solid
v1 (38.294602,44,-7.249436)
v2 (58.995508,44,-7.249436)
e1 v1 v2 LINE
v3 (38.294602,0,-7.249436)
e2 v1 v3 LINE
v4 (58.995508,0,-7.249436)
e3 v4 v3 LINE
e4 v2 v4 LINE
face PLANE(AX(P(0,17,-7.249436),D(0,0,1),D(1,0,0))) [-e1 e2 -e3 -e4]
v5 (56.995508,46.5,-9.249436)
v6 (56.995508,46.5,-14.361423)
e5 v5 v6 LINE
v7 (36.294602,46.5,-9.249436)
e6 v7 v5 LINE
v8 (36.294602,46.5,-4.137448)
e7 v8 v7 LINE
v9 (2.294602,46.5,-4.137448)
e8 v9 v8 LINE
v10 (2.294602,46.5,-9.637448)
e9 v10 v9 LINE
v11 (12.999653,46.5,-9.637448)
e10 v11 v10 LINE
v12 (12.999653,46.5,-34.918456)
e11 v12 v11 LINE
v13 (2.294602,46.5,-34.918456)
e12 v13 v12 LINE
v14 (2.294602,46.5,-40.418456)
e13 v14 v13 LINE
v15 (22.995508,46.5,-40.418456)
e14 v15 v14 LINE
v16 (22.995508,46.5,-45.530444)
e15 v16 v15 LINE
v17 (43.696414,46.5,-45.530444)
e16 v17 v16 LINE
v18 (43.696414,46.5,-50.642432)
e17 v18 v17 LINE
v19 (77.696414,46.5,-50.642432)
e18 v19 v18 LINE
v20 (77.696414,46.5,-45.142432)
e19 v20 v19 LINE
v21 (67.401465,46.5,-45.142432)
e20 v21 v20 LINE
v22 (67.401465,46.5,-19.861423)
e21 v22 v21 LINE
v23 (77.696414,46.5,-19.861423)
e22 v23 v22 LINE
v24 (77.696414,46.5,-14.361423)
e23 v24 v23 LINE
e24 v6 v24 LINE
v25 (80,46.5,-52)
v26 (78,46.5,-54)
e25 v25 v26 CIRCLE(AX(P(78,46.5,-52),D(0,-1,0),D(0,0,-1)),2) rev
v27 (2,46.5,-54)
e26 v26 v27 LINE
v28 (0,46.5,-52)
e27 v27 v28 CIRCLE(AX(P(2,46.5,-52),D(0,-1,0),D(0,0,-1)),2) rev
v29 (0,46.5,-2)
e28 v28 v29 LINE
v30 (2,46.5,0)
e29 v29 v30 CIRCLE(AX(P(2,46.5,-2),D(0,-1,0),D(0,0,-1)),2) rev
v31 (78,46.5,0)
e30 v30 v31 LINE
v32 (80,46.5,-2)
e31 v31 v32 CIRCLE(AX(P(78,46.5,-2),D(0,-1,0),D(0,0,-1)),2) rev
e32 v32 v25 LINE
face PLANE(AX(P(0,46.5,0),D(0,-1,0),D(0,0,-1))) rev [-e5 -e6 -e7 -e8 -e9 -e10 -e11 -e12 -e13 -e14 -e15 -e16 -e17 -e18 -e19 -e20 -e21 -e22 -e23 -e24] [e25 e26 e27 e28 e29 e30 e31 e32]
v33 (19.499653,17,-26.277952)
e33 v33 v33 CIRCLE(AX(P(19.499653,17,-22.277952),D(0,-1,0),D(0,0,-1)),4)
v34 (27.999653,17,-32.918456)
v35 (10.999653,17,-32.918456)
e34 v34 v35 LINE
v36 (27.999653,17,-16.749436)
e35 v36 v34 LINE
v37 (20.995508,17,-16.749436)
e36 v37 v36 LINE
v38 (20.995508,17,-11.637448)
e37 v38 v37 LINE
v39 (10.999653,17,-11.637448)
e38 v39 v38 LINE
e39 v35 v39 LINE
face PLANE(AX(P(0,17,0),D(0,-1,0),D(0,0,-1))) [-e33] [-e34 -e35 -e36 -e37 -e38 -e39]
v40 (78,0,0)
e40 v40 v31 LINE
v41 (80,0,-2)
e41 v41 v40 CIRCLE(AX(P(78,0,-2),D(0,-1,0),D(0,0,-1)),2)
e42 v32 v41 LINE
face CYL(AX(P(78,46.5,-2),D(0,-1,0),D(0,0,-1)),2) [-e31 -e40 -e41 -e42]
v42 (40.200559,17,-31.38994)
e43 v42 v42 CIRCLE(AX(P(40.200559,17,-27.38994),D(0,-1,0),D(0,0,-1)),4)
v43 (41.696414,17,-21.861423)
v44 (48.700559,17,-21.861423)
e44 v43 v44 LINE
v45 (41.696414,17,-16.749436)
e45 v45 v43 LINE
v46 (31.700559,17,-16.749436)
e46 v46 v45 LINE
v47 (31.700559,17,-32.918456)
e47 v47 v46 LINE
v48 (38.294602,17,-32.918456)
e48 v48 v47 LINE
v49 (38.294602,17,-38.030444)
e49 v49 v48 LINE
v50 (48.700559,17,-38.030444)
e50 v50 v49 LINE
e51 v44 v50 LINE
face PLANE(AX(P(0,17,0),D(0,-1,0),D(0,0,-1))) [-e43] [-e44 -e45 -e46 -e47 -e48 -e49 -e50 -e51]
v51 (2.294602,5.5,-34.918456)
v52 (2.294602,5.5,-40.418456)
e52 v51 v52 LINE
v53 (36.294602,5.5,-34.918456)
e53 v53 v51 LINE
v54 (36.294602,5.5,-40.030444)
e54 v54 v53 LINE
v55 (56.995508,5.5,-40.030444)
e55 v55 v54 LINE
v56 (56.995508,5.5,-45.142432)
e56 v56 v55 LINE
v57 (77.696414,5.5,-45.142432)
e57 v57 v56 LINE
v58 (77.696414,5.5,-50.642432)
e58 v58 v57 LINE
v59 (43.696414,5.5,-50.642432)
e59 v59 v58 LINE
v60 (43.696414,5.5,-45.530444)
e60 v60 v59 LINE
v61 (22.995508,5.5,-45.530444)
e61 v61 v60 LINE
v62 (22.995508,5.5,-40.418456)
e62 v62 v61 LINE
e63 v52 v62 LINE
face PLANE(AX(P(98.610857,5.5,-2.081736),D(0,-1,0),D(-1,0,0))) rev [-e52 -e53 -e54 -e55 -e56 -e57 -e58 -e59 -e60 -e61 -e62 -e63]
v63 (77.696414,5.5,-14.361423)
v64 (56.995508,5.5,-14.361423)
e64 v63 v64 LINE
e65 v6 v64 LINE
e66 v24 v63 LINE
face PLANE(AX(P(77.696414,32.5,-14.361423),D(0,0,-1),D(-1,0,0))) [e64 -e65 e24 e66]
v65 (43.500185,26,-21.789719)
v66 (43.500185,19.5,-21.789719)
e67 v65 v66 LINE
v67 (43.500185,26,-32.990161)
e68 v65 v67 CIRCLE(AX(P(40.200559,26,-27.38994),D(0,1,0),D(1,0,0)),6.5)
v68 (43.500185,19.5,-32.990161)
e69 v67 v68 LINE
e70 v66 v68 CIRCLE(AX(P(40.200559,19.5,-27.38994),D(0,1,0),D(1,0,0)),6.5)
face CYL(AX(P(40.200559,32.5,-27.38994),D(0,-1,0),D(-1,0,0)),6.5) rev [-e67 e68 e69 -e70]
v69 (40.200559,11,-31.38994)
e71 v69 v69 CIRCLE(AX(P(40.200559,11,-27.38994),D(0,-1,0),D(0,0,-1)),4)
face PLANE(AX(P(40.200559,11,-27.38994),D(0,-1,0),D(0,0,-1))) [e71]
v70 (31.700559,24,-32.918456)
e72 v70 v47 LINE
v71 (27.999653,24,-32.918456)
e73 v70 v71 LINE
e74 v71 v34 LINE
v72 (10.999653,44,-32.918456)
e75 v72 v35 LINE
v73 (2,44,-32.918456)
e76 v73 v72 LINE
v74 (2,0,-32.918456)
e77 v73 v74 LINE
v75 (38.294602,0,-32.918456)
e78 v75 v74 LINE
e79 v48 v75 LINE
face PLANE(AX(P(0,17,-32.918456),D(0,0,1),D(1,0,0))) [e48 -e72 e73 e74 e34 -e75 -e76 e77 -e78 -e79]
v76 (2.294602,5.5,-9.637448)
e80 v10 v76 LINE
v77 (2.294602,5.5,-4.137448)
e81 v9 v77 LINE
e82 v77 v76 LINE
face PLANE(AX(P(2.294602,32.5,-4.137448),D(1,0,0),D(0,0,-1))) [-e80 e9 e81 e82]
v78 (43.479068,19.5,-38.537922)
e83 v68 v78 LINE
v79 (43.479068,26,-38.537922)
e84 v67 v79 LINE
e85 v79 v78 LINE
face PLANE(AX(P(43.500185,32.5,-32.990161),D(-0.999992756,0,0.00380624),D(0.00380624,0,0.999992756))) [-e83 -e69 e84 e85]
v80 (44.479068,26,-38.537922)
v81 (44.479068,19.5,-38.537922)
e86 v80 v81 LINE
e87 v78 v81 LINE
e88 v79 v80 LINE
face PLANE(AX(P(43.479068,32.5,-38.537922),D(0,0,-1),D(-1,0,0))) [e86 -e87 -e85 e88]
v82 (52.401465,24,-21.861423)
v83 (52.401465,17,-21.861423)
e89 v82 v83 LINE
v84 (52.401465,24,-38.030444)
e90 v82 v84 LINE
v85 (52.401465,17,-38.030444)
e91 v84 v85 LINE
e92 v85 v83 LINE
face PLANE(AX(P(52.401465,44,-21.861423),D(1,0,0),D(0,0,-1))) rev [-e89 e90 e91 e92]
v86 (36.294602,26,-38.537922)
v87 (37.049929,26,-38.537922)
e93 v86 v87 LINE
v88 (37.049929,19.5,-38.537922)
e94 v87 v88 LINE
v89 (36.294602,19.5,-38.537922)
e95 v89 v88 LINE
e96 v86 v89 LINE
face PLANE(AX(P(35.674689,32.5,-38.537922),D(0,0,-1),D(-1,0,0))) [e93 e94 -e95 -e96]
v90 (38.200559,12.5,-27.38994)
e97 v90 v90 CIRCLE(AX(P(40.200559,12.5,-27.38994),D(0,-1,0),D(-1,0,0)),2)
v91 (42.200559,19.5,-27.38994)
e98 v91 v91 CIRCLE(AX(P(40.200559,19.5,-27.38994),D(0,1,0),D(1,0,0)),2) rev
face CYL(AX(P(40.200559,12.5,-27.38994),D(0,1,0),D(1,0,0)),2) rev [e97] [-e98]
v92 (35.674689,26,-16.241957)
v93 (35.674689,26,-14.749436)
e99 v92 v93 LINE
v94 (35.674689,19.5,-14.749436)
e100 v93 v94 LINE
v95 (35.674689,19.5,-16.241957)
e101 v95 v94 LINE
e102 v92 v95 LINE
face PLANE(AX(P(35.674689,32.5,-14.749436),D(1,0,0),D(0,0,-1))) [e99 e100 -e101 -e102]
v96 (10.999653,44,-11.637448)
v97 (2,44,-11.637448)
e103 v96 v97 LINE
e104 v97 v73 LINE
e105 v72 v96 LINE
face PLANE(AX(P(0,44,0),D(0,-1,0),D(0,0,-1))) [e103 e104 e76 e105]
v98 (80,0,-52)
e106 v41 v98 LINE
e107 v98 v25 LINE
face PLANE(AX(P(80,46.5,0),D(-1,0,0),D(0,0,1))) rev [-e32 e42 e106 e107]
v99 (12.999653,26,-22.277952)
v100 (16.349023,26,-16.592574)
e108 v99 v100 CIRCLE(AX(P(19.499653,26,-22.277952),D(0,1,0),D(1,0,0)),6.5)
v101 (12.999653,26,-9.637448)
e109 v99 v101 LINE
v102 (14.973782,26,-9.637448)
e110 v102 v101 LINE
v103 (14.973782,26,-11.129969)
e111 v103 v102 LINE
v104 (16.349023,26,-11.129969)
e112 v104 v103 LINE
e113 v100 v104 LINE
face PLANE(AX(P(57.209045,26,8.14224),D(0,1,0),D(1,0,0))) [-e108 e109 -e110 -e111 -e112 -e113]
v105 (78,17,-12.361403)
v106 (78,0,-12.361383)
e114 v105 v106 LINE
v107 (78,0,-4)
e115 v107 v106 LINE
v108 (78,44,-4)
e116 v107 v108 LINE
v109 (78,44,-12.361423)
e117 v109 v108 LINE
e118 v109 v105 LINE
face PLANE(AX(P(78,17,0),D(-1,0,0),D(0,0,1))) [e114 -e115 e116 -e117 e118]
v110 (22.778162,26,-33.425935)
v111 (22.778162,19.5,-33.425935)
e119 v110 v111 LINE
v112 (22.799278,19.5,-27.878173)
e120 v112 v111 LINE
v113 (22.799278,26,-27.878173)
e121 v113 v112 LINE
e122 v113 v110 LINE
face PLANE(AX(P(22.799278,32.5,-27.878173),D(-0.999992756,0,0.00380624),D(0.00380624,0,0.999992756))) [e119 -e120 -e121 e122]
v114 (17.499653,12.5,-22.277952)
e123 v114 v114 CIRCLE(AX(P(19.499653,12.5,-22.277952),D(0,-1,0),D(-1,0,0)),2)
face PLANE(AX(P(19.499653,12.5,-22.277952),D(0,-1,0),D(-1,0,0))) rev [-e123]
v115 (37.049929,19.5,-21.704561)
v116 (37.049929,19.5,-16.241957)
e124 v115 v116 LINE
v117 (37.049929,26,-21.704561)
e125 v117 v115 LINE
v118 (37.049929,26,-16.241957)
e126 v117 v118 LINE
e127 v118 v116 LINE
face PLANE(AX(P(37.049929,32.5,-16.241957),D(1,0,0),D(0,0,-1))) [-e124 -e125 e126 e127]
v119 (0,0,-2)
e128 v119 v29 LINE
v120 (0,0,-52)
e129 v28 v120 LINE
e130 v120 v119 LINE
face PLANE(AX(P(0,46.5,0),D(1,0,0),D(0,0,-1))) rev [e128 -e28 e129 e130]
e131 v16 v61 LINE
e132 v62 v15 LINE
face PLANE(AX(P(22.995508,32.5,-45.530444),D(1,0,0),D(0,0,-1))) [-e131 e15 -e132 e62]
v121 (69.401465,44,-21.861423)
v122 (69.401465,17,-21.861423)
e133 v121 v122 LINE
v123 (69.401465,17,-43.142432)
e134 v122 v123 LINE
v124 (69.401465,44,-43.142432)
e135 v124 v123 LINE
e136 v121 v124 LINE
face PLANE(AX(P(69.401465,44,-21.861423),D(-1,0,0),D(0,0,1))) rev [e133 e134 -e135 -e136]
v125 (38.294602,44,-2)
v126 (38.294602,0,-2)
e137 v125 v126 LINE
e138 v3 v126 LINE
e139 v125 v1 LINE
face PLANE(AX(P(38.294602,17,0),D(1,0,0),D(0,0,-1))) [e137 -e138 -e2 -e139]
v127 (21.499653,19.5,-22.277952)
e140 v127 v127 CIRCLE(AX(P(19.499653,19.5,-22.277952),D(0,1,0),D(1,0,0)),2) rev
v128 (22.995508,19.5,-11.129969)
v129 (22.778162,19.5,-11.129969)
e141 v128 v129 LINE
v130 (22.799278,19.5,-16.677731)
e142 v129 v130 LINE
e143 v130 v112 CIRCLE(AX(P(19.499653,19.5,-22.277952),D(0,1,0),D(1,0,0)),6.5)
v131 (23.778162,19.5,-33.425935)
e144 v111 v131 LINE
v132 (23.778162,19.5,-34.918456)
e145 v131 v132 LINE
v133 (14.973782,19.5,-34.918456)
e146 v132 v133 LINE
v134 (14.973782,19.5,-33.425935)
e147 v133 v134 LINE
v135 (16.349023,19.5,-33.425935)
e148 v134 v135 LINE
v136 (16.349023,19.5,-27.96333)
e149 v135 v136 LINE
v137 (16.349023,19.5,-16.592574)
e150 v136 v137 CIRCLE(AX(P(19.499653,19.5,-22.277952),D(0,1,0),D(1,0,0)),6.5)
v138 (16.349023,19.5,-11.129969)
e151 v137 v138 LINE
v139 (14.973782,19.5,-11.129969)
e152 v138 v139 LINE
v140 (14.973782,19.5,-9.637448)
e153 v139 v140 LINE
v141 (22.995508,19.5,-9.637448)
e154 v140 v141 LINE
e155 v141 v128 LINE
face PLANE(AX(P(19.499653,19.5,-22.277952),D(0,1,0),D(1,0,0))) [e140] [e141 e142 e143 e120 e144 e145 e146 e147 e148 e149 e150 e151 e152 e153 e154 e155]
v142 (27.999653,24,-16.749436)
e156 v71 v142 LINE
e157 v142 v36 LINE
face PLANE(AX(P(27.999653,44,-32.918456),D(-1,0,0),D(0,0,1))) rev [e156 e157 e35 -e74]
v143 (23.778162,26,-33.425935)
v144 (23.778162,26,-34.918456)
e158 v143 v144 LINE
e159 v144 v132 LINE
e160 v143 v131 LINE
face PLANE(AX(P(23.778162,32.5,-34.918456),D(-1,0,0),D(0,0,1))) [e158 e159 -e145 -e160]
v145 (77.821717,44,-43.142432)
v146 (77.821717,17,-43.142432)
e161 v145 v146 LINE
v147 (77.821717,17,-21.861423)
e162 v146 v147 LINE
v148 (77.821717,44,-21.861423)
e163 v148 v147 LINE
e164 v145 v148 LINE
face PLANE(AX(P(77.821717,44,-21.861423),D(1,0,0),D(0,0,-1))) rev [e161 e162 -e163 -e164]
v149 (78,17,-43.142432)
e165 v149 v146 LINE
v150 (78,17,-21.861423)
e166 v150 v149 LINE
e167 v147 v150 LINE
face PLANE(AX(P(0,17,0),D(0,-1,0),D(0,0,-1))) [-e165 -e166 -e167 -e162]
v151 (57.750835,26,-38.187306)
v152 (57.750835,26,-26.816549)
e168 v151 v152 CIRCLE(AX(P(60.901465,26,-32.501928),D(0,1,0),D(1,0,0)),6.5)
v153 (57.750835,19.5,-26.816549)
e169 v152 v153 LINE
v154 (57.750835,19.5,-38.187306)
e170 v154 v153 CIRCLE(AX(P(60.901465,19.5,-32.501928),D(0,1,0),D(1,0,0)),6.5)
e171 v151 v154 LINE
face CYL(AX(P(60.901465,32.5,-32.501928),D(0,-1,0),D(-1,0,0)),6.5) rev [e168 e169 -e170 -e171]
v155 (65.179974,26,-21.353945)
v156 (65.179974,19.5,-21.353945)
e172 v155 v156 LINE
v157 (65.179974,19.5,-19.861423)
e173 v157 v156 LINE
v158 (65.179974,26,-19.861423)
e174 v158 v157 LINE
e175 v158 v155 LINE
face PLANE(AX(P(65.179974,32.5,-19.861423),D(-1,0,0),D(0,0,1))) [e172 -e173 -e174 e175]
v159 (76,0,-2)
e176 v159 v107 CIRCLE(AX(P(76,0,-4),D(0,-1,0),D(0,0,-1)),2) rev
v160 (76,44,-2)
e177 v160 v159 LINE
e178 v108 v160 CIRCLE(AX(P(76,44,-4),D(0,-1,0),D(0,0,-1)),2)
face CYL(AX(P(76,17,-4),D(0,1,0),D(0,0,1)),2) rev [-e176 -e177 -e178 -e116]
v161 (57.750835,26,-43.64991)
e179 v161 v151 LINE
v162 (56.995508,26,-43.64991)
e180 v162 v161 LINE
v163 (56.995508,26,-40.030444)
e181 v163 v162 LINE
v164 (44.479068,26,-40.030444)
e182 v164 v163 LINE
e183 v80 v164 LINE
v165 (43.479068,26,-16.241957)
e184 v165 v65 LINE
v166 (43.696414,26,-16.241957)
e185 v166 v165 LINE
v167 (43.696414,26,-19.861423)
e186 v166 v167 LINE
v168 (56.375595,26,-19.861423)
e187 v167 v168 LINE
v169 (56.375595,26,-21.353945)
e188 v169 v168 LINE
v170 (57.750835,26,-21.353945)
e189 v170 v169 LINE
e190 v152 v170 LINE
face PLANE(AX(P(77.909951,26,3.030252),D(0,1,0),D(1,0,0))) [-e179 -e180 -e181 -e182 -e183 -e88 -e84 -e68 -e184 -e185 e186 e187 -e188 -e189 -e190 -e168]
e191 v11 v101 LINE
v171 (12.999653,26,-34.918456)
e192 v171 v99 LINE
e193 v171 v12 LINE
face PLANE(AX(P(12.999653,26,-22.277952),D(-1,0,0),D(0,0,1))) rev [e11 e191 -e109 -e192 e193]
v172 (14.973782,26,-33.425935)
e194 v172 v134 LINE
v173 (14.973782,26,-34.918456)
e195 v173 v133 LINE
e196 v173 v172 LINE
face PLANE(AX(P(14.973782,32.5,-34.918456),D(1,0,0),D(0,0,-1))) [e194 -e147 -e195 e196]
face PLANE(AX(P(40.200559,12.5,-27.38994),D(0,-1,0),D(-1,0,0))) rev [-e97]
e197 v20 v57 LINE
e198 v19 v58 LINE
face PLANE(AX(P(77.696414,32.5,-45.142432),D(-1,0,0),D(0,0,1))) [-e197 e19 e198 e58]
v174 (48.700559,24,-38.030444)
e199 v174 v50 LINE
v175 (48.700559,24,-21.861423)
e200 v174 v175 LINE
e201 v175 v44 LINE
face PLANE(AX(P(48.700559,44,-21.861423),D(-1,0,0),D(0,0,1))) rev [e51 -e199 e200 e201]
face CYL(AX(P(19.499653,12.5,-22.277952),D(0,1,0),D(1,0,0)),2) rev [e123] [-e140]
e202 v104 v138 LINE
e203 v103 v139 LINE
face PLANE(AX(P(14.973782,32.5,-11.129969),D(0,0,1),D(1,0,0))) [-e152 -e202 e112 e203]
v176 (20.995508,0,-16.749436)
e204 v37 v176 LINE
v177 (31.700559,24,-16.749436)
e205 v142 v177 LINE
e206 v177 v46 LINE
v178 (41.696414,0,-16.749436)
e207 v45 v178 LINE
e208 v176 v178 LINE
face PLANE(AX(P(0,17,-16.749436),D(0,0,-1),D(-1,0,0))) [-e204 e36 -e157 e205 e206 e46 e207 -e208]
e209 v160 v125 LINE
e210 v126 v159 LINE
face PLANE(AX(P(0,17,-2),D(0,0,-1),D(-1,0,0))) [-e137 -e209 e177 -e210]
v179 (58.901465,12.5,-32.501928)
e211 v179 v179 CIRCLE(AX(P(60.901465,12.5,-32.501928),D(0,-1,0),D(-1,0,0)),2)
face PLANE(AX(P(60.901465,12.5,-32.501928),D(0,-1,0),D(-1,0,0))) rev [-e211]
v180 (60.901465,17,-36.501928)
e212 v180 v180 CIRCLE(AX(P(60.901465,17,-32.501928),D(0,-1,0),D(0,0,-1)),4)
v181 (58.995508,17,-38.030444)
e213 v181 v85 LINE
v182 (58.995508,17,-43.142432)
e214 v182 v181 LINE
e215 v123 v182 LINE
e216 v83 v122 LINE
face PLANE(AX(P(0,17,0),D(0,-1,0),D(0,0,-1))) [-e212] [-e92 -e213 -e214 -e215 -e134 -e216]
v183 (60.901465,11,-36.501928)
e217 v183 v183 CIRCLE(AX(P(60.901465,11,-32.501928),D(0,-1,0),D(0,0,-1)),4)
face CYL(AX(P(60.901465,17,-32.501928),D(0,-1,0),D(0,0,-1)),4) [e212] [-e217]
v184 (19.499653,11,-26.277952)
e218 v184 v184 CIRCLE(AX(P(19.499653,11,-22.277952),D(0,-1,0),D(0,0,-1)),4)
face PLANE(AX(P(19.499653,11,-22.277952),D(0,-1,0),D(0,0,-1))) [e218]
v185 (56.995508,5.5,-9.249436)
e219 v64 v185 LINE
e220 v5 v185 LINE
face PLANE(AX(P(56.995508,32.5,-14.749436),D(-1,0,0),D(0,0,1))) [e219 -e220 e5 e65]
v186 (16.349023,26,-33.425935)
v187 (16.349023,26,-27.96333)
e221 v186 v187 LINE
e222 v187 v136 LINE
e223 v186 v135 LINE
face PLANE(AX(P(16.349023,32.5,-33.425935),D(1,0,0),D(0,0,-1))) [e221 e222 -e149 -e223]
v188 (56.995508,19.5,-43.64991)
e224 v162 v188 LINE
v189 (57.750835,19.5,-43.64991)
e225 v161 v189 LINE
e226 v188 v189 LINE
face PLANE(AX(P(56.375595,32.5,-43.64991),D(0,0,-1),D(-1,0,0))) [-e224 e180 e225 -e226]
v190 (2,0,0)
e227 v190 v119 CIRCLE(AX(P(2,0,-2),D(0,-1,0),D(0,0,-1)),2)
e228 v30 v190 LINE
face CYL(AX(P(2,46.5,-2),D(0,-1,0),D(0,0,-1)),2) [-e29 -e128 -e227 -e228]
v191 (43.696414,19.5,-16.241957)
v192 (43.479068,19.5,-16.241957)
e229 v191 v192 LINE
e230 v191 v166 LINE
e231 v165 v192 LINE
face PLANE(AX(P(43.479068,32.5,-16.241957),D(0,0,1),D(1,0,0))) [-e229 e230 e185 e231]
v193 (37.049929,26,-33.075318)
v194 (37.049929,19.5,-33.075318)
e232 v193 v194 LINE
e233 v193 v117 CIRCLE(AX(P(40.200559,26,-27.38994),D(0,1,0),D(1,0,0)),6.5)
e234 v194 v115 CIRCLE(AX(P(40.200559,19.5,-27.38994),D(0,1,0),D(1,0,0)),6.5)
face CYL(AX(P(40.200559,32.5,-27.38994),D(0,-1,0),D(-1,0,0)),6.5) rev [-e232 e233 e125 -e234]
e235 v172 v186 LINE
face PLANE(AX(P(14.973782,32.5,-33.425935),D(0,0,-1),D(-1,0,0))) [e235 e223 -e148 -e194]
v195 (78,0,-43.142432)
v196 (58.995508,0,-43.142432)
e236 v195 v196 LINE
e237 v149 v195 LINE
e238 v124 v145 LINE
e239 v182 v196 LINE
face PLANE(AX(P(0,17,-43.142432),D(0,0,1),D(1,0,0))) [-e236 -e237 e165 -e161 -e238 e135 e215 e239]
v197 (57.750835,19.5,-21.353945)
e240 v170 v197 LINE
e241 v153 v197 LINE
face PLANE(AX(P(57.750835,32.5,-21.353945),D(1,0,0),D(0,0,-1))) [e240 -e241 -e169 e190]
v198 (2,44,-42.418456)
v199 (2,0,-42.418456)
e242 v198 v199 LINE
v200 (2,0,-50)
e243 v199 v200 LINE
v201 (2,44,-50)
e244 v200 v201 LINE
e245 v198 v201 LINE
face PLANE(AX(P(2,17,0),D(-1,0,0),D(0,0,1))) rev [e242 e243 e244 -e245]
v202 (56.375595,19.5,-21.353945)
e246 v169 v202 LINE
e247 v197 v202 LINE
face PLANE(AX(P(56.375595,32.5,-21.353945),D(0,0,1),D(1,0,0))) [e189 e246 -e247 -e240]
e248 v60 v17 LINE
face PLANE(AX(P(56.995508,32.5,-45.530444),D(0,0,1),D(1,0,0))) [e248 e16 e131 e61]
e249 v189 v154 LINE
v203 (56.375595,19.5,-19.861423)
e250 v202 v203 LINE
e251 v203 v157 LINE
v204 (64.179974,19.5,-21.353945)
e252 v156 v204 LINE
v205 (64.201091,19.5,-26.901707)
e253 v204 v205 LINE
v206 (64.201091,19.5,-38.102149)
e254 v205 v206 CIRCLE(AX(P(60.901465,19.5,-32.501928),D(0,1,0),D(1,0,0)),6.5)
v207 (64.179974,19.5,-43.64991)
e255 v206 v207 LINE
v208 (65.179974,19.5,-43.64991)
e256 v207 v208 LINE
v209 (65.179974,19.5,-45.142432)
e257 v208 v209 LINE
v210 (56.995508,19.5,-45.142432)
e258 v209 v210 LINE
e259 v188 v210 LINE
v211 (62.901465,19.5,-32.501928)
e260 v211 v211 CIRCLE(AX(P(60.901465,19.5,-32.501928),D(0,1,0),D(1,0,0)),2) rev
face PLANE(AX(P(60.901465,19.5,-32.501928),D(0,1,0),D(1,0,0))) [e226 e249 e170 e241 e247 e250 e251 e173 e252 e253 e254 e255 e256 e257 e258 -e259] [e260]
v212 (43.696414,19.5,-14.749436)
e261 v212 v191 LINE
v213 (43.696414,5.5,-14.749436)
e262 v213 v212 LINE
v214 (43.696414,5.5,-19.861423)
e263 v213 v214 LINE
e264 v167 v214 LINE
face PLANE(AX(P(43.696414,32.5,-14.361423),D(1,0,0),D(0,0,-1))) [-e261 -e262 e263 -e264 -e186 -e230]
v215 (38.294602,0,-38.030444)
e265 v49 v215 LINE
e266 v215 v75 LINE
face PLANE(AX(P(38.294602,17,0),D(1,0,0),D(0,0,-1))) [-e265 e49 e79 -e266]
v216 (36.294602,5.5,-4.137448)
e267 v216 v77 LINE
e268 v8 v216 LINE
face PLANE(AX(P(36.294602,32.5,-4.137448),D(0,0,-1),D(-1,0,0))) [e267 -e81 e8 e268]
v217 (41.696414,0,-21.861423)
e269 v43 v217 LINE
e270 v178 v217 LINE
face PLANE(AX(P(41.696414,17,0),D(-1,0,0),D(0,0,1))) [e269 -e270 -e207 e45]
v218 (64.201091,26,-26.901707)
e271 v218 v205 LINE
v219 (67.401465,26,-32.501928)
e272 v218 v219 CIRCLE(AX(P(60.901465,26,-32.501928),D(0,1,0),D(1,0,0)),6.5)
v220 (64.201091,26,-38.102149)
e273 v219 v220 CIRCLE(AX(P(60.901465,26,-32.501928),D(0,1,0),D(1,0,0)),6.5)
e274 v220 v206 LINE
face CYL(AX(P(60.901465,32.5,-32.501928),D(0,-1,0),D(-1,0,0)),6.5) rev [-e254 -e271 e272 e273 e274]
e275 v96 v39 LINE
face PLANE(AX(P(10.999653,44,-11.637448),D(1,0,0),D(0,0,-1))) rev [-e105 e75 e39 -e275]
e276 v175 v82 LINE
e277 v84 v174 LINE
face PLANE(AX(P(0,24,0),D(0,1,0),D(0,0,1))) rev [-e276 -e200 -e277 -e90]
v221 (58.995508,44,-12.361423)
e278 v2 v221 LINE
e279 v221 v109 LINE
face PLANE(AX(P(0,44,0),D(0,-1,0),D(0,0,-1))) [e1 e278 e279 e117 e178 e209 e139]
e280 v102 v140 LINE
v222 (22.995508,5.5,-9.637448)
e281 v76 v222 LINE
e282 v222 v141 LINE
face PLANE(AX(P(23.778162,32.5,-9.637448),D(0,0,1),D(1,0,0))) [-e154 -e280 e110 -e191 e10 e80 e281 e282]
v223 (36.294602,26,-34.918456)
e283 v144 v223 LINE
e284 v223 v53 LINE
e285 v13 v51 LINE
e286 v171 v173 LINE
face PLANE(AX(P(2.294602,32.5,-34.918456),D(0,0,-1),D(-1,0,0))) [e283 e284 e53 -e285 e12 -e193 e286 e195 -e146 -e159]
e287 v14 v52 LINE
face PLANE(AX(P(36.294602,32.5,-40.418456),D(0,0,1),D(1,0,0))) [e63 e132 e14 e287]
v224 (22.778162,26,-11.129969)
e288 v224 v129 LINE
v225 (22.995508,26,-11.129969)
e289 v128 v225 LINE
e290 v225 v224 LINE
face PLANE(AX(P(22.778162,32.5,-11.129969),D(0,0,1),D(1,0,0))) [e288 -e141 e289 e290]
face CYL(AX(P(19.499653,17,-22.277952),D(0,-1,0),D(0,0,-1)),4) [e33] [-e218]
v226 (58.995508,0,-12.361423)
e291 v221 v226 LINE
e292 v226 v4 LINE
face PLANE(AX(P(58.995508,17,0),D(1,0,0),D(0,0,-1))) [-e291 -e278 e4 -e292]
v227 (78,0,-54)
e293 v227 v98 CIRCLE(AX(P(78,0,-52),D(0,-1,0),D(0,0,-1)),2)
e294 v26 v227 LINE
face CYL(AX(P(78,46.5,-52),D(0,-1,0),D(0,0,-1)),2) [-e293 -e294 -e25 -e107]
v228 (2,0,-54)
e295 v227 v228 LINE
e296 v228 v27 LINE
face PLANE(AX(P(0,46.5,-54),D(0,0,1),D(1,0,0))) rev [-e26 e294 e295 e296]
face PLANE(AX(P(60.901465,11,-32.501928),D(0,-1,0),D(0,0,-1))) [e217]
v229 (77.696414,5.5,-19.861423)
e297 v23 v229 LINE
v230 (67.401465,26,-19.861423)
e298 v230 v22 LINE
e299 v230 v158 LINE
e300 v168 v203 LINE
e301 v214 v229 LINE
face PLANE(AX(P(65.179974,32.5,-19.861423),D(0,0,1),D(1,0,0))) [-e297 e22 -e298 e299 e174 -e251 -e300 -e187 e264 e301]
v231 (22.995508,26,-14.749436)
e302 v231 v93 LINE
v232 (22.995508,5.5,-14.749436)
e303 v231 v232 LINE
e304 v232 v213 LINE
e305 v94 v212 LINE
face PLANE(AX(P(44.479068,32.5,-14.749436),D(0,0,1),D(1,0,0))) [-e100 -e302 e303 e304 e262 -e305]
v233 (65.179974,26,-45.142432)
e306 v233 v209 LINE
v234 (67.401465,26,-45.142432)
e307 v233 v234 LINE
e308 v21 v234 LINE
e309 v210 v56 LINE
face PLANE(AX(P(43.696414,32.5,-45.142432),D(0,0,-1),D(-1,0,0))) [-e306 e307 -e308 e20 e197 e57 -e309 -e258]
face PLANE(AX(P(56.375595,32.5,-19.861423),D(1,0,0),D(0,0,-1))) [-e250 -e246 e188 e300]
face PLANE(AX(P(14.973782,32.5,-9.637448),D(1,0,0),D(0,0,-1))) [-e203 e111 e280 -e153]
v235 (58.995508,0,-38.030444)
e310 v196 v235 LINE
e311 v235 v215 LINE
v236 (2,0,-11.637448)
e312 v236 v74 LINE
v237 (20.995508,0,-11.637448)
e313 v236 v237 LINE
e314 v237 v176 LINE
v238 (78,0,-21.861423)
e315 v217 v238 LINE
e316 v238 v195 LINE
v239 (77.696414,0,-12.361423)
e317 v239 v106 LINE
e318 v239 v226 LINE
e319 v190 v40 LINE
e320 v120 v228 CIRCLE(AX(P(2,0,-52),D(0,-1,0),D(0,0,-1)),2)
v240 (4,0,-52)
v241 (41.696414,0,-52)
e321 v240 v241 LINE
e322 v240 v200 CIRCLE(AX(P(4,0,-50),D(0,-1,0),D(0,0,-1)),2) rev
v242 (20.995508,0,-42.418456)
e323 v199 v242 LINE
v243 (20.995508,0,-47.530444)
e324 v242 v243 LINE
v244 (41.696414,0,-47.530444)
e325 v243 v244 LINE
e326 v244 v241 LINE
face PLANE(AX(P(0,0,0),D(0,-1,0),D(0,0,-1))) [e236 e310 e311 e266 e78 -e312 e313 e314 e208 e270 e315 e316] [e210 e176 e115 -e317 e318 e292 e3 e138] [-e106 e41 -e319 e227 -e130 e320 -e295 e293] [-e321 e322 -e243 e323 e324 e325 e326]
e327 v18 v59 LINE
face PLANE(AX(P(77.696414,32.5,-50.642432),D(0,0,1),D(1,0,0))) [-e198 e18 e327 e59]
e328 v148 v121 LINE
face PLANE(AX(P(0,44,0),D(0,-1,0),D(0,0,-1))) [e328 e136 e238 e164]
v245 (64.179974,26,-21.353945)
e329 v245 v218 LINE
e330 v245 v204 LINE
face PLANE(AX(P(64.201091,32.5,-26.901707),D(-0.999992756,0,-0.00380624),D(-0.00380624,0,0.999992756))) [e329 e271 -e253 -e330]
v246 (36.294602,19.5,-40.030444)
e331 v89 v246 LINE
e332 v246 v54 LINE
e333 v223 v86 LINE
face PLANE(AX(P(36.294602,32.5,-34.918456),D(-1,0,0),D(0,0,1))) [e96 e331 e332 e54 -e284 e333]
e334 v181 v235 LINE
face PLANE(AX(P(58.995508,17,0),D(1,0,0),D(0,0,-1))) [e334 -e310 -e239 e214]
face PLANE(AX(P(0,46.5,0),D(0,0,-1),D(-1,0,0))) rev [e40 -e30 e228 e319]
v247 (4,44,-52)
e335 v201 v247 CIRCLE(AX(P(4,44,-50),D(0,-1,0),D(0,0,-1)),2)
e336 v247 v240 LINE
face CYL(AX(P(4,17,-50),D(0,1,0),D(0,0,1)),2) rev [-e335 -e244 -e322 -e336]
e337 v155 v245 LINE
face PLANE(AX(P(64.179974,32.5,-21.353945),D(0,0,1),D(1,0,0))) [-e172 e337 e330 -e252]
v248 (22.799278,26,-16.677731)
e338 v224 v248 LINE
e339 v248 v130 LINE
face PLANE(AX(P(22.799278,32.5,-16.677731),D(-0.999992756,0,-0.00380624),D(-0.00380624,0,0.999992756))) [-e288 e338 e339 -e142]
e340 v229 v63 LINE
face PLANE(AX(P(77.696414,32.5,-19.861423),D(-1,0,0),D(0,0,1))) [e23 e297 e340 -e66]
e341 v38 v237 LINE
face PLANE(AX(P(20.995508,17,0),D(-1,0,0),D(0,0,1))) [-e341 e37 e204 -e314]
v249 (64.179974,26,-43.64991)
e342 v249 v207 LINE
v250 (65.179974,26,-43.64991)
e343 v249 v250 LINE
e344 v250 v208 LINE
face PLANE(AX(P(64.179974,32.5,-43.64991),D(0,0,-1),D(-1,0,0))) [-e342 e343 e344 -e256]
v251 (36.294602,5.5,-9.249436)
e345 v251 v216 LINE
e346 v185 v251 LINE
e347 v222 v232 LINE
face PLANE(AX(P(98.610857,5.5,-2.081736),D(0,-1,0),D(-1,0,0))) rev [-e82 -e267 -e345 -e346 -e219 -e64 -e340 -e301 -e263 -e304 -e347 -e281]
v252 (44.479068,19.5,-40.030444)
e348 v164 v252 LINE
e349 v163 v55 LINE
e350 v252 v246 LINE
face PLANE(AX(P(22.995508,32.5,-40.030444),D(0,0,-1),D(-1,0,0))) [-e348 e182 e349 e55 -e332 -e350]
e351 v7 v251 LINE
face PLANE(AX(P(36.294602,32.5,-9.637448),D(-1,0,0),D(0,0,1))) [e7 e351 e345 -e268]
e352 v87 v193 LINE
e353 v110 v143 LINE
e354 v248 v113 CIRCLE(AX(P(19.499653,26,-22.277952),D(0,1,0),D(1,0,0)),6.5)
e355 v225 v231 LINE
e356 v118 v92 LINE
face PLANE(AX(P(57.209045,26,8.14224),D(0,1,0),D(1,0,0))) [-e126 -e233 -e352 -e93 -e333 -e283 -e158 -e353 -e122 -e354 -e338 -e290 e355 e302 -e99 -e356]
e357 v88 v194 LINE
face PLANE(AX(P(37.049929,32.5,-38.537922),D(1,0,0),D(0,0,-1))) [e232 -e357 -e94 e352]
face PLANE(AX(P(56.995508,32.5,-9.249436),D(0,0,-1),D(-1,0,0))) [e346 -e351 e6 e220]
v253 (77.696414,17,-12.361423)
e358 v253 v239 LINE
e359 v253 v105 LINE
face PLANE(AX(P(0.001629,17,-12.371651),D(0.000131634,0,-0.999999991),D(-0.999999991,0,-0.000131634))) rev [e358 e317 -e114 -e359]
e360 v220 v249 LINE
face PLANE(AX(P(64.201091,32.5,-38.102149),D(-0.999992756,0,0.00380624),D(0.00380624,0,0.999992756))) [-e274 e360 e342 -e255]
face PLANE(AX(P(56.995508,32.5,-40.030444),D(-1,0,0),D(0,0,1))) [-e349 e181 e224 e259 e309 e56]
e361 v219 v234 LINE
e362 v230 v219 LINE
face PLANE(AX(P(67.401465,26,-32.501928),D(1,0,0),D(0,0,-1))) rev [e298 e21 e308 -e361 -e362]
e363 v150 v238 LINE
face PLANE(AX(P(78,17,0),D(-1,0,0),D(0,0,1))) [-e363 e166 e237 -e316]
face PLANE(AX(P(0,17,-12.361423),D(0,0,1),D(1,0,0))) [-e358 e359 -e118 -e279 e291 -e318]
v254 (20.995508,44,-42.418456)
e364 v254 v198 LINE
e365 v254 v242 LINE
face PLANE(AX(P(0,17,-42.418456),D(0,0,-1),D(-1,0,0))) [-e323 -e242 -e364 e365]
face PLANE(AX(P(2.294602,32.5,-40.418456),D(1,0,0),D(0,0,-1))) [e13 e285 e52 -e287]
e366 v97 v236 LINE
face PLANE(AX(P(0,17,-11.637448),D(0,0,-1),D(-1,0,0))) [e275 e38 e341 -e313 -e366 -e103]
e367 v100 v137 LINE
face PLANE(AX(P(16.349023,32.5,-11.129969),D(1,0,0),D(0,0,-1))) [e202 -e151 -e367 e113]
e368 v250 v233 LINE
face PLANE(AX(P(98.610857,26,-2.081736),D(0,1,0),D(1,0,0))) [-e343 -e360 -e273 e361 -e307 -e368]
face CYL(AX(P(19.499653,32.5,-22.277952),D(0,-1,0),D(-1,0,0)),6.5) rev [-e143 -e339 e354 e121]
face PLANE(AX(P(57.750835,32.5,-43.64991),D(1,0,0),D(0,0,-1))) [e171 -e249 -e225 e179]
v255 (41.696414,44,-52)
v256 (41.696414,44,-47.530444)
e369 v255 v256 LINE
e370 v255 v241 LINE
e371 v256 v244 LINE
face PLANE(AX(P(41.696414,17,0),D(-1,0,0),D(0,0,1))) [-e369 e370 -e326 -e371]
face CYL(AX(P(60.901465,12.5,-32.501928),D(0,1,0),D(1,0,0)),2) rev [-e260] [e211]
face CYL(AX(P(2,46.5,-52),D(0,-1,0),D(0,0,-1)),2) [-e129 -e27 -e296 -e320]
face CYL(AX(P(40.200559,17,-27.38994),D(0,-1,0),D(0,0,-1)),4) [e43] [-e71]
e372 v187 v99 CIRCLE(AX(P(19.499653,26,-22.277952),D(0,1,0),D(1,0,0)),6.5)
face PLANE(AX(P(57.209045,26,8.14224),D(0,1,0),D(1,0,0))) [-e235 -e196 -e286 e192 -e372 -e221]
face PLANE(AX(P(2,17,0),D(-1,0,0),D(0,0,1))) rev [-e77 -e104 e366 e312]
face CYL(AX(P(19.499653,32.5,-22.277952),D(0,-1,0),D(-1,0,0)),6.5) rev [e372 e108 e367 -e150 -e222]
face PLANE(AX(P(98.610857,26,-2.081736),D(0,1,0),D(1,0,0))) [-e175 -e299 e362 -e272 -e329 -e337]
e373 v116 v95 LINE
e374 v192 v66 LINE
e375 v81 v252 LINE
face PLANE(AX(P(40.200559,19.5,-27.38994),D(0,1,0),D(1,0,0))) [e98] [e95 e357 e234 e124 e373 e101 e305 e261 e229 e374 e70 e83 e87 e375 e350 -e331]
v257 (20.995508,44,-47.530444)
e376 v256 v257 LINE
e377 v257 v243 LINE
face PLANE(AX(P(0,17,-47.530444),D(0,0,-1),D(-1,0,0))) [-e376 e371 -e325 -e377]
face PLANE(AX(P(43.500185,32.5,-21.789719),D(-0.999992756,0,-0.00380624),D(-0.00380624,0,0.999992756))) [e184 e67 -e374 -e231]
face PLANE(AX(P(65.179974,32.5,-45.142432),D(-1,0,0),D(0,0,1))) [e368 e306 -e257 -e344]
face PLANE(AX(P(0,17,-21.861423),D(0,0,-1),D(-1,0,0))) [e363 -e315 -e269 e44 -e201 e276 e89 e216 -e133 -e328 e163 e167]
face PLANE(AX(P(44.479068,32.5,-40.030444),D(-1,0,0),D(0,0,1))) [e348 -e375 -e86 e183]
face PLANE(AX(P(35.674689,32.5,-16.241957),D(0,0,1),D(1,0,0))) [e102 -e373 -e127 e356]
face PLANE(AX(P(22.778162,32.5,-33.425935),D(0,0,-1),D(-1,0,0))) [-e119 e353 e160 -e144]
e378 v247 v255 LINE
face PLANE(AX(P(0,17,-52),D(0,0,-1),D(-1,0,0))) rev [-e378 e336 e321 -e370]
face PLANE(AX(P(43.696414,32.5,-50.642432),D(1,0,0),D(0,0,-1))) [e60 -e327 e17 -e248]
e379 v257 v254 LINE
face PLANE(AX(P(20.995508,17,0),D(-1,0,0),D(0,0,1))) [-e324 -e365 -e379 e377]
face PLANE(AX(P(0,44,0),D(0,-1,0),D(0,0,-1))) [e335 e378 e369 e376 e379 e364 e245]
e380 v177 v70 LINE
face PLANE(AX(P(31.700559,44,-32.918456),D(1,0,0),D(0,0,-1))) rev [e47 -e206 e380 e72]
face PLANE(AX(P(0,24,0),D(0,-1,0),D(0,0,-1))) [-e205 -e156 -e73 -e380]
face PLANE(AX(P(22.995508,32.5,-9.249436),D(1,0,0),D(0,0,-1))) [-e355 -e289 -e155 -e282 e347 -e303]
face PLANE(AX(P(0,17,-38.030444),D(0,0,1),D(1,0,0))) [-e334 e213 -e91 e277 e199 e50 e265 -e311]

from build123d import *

# Parameters (mm, degrees)
SKETCH1_W                                 = 80
SKETCH1_H                                 = 54
BOSS_EXTRUDE2_DEPTH                       = 46.5
FILLET1_R                                 = 2
TIE_START                                 = 17.648406802
TIE_FIGHTER_LAYING_DOWN_BLANK_DEPTH       = 27
TIE_START_2                               = 3.648406802
TIE_FIGHTER_LAYING_DOWN_BLANK_2_OUTLINE_W = 5.5
TIE_FIGHTER_LAYING_DOWN_BLANK_2_OUTLINE_H = 34
TIE_FIGHTER_LAYING_DOWN_BLANK_2_DEPTH     = 14
TIE_START_3                               = 24.148406802
TIE_FIGHTER_LAYING_DOWN_BLANK_3_DEPTH     = 20.5
TIE_START_4                               = 10.648406802
TIE_FIGHTER_LAYING_DOWN_BLANK_4_OUTLINE_R = 2
TIE_FIGHTER_LAYING_DOWN_BLANK_4_DEPTH     = 7
BODY_MOVE_COPY3_ANGLE                     = 90
SKETCH2_W                                 = 7.700906033
SKETCH2_H                                 = 20.169020688
SKETCH2_W_2                               = 7.700906032
CUT_EXTRUDE1_DEPTH                        = 30
SKETCH3_R                                 = 4
CUT_EXTRUDE2_DEPTH                        = 17
SKETCH4_W                                 = 3.700906032
SKETCH4_H                                 = 16.169020688
SKETCH4_W_2                               = 8.420251913
SKETCH4_H_2                               = 21.281008515
SKETCH4_W_3                               = 8.999653324
SKETCH4_W_4                               = 3.700906033
CUT_EXTRUDE3_DEPTH                        = 27
FILLET2_R                                 = 2
SKETCH5_W                                 = 3.700906033
SKETCH5_H                                 = 16.169020688
SKETCH5_W_2                               = 3.700906032
BOSS_EXTRUDE3_DEPTH                       = 2
SKETCH6_R                                 = 4
CUT_EXTRUDE4_DEPTH                        = 11


with BuildPart() as part:
    # Sketch1 → Boss-Extrude2 (new body)
    with BuildSketch(Plane(origin=(0, 0, 0), x_dir=(1, 0, 0), z_dir=(0, 1, 0))):
        with Locations((40, 27)):
            Rectangle(SKETCH1_W, SKETCH1_H)
    extrude(amount=BOSS_EXTRUDE2_DEPTH)

    # Fillet1
    fillet1_edges = [part.edges().sort_by_distance(p)[0] for p in [
        (0, 23.25, -54),
        (80, 23.25, -54),
        (80, 23.25, 0),
        (0, 23.25, 0),
    ]]
    fillet(fillet1_edges, radius=FILLET1_R)


with BuildPart() as body_2:
    # Tie Fighter Laying Down Blank: read off the stored shape, not the designer's step
    # Tie Fighter Laying Down Blank outline → Tie Fighter Laying Down Blank (new body)
    with BuildSketch(Plane(origin=(0, 0, 0), x_dir=(1, 0, 0), z_dir=(0, 1, 0)).offset(TIE_START)):
        with BuildLine():
            Line((-37.161017612, 22.550360254), (-37.161017612, 23.550360254))
            Line((-37.161017612, 23.550360254), (-31.61325597, 23.529243987))
            ThreePointArc((-31.61325597, 23.529243987), (-26.013035095, 20.32886914), (-20.412814219, 23.529243987))
            Line((-20.412814219, 23.529243987), (-14.865052577, 23.550360254))
            Line((-14.865052577, 23.550360254), (-14.865052577, 22.550360254))
            Line((-14.865052577, 22.550360254), (-13.372530837, 22.550360254))
            Line((-13.372530837, 22.550360254), (-13.372530837, 10.033920638))
            Line((-13.372530837, 10.033920638), (-7.872530837, 10.033920638))
            Line((-7.872530837, 10.033920638), (-7.872530837, 44.033920638))
            Line((-7.872530837, 44.033920638), (-13.372530837, 44.033920638))
            Line((-13.372530837, 44.033920638), (-13.372530837, 31.354739987))
            Line((-13.372530837, 31.354739987), (-14.865052577, 31.354739987))
            Line((-14.865052577, 31.354739987), (-14.865052577, 29.979499621))
            Line((-14.865052577, 29.979499621), (-20.327656693, 29.979499621))
            ThreePointArc((-20.327656693, 29.979499621), (-26.013035095, 33.32886914), (-31.698413496, 29.979499621))
            Line((-31.698413496, 29.979499621), (-37.161017612, 29.979499621))
            Line((-37.161017612, 29.979499621), (-37.161017612, 31.354739987))
            Line((-37.161017612, 31.354739987), (-38.653539352, 31.354739987))
            Line((-38.653539352, 31.354739987), (-38.653539352, 44.033920638))
            Line((-38.653539352, 44.033920638), (-44.153539352, 44.033920638))
            Line((-44.153539352, 44.033920638), (-44.153539352, 10.033920638))
            Line((-44.153539352, 10.033920638), (-38.653539352, 10.033920638))
            Line((-38.653539352, 10.033920638), (-38.653539352, 22.550360254))
            Line((-38.653539352, 22.550360254), (-37.161017612, 22.550360254))
        make_face()
    extrude(amount=TIE_FIGHTER_LAYING_DOWN_BLANK_DEPTH)

    # Tie Fighter Laying Down Blank 2 outline → Tie Fighter Laying Down Blank 2 (add)
    with BuildSketch(Plane(origin=(0, 0, 0), x_dir=(1, 0, 0), z_dir=(0, 1, 0)).offset(TIE_START_2)):
        with Locations((-41.403539352, 27.033920638)):
            Rectangle(TIE_FIGHTER_LAYING_DOWN_BLANK_2_OUTLINE_W, TIE_FIGHTER_LAYING_DOWN_BLANK_2_OUTLINE_H)
        with Locations((-10.622530837, 27.033920638)):
            Rectangle(TIE_FIGHTER_LAYING_DOWN_BLANK_2_OUTLINE_W, TIE_FIGHTER_LAYING_DOWN_BLANK_2_OUTLINE_H)
    extrude(amount=TIE_FIGHTER_LAYING_DOWN_BLANK_2_DEPTH)

    # Tie Fighter Laying Down Blank 3 outline → Tie Fighter Laying Down Blank 3 (add)
    with BuildSketch(Plane(origin=(0, 0, 0), x_dir=(1, 0, 0), z_dir=(0, 1, 0)).offset(TIE_START_3)):
        with BuildLine():
            Line((-31.61325597, 23.529243987), (-37.161017612, 23.550360254))
            Line((-37.161017612, 23.550360254), (-37.161017612, 22.550360254))
            Line((-37.161017612, 22.550360254), (-38.653539352, 22.550360254))
            Line((-38.653539352, 22.550360254), (-38.653539352, 20.32886914))
            Line((-38.653539352, 20.32886914), (-26.013035094, 20.32886914))
            ThreePointArc((-26.013035094, 20.32886914), (-29.238127071, 21.18539665), (-31.61325597, 23.529243987))
        make_face()
        with BuildLine():
            ThreePointArc((-20.412814219, 23.529243987), (-22.787943118, 21.18539665), (-26.013035094, 20.32886914))
            Line((-26.013035094, 20.32886914), (-13.372530837, 20.32886914))
            Line((-13.372530837, 20.32886914), (-13.372530837, 22.550360254))
            Line((-13.372530837, 22.550360254), (-14.865052577, 22.550360254))
            Line((-14.865052577, 22.550360254), (-14.865052577, 23.550360254))
            Line((-14.865052577, 23.550360254), (-20.412814219, 23.529243987))
        make_face()
        with BuildLine():
            Line((-38.653539352, 33.32886914), (-38.653539352, 31.354739987))
            Line((-38.653539352, 31.354739987), (-37.161017612, 31.354739987))
            Line((-37.161017612, 31.354739987), (-37.161017612, 29.979499621))
            Line((-37.161017612, 29.979499621), (-31.698413496, 29.979499621))
            ThreePointArc((-31.698413496, 29.979499621), (-29.31234577, 32.429275292), (-26.013035095, 33.32886914))
            Line((-26.013035095, 33.32886914), (-38.653539352, 33.32886914))
        make_face()
        with BuildLine():
            Line((-13.372530837, 33.32886914), (-26.013035095, 33.32886914))
            ThreePointArc((-26.013035095, 33.32886914), (-22.713724419, 32.429275292), (-20.327656693, 29.979499621))
            Line((-20.327656693, 29.979499621), (-14.865052577, 29.979499621))
            Line((-14.865052577, 29.979499621), (-14.865052577, 31.354739987))
            Line((-14.865052577, 31.354739987), (-13.372530837, 31.354739987))
            Line((-13.372530837, 31.354739987), (-13.372530837, 33.32886914))
        make_face()
    extrude(amount=TIE_FIGHTER_LAYING_DOWN_BLANK_3_DEPTH)

    # Tie Fighter Laying Down Blank 4 outline → Tie Fighter Laying Down Blank 4 (add)
    with BuildSketch(Plane(origin=(0, 0, 0), x_dir=(1, 0, 0), z_dir=(0, 1, 0)).offset(TIE_START_4)):
        with Locations((-26.013035095, 26.82886914)):
            Circle(TIE_FIGHTER_LAYING_DOWN_BLANK_4_OUTLINE_R)
    extrude(amount=TIE_FIGHTER_LAYING_DOWN_BLANK_4_DEPTH)


with BuildPart() as body_2_1:
    # Body-Move/Copy2: read off the stored shape, not the designer's step
    # Body-Move/Copy2: moved
    add(body_2.part.moved(Location((0, 1.8515932, 0))))


with BuildPart() as body_2_2:
    # Body-Move/Copy3: moved
    add(body_2_1.part.rotate(Axis((-26.013075057, 0, -27.033920638), (0, 1, 0)), BODY_MOVE_COPY3_ANGLE))


with BuildPart() as body_2_3:
    # Body-Move/Copy4: moved
    add(body_2_2.part.moved(Location((45.307676883, 0, 6.774371597))))


with BuildPart() as body_3:
    # Body-Move/Copy6: read off the stored shape, not the designer's step
    # Body-Move/Copy6: copy of body 2
    add(body_2_3.part.moved(Location((41.4018121, 0, -10.2239757))))


with BuildPart() as body_4:
    # Body-Move_Copy6 2: copy of body 2
    add(body_2_3.part.moved(Location((20.700906, 0, -5.1119878))))


with BuildPart() as body_3_1:
    # Body-Move/Copy7: read off the stored shape, not the designer's step
    # Body-Move/Copy7: moved
    add(body_3.part.moved(Location((0, 0, -2.018363))))


with BuildPart() as body_4_1:
    # Body-Move_Copy7 2: moved
    add(body_4.part.moved(Location((0, 0, -2.018363))))


with BuildPart() as body_2_4:
    # Body-Move_Copy7 3: moved
    add(body_2_3.part.moved(Location((0, 0, -2.018363))))


with BuildPart() as part_1:
    add(part.part)

    # Intersect1: read off the stored shape, not the designer's step
    # Intersect1: cut body 3, body 4, body 2
    add(body_3_1.part, mode=Mode.SUBTRACT)
    add(body_4_1.part, mode=Mode.SUBTRACT)
    add(body_2_4.part, mode=Mode.SUBTRACT)

    # Sketch2 → Cut-Extrude1 (cut)
    with BuildSketch(Plane(origin=(0, 26, 0), x_dir=(1, 0, 0), z_dir=(0, 1, 0))):
        with Locations((29.850106341, 24.833945924)):
            Rectangle(SKETCH2_W, SKETCH2_H)
        with Locations((50.551012373, 29.945933752)):
            Rectangle(SKETCH2_W_2, SKETCH2_H)
    extrude(amount=CUT_EXTRUDE1_DEPTH, mode=Mode.SUBTRACT)

    # Sketch3 → Cut-Extrude2 (cut)
    # profile 1 of 3: a face of its own
    with BuildSketch(Plane.XZ):
        Polygon((38.294601826, -32.918456268), (2, -32.918456268), (2, -11.637447753), (20.995507859, -11.637447753), (20.995507859, -16.74943558), (41.696413892, -16.74943558), (41.696413892, -21.861423408), (78, -21.861423408), (78, -43.142431923), (58.995507859, -43.142431923), (58.995507859, -38.030444096), (38.294601826, -38.030444096), align=None)
        with Locations(Location((60.901465389, -32.501927666, 0), (0, 0, 270))):
            Circle(SKETCH3_R, mode=Mode.SUBTRACT)
        with Locations(Location((40.200559357, -27.389939838, 0), (0, 0, 270))):
            Circle(SKETCH3_R, mode=Mode.SUBTRACT)
        with Locations(Location((19.499653324, -22.277952011, 0), (0, 0, 270))):
            Circle(SKETCH3_R, mode=Mode.SUBTRACT)
    # profile 2 of 3: a face of its own
    with BuildSketch(Plane.XZ):
        Polygon((2.294601826, -42.418456268), (20.995507859, -42.418456268), (20.995507859, -47.530444096), (41.696413892, -47.530444096), (41.696413892, -50.642391961), (41.696413892, -52), (2, -52), (2, -42.418456268), align=None)
    # profile 3 of 3: a face of its own
    with BuildSketch(Plane.XZ):
        Polygon((77.696413892, -12.361423408), (58.995507859, -12.361423408), (58.995507859, -7.24943558), (38.294601826, -7.24943558), (38.294601826, -2), (78, -2), (78, -12.361383446), align=None)
    extrude(amount=-CUT_EXTRUDE2_DEPTH, mode=Mode.SUBTRACT)

    # Sketch4 → Cut-Extrude3 (cut)
    with BuildSketch(Plane.XZ.offset(-17)):
        Polygon((78, -12.361423408), (58.995507859, -12.361423408), (58.995507859, -7.24943558), (38.294601826, -7.24943558), (38.294601826, -2), (58.995507859, -2), (78, -2), align=None)
        Polygon((2, -42.418456268), (20.995507859, -42.418456268), (20.995507859, -47.530444096), (41.696413892, -47.530444096), (41.696413892, -52), (20.995507859, -52), (2, -52), align=None)
        with Locations((50.551012373, -29.945933752)):
            Rectangle(SKETCH4_W, SKETCH4_H)
        with Locations((73.611591346, -32.501927666)):
            Rectangle(SKETCH4_W_2, SKETCH4_H_2)
        with Locations((6.499826662, -22.277952011)):
            Rectangle(SKETCH4_W_3, SKETCH4_H_2)
        with Locations((29.850106341, -24.833945924)):
            Rectangle(SKETCH4_W_4, SKETCH4_H)
    extrude(amount=-CUT_EXTRUDE3_DEPTH, mode=Mode.SUBTRACT)

    # Fillet2
    fillet2_edges = [part_1.edges().sort_by_distance(p)[0] for p in [
        (2, 22, -52),
        (78, 22, -2),
    ]]
    fillet(fillet2_edges, radius=FILLET2_R)

    # Sketch5 → Boss-Extrude3 (add)
    with BuildSketch(Plane(origin=(0, 26, 0), x_dir=(1, 0, 0), z_dir=(0, 1, 0))):
        with Locations((29.850106341, 24.833945924)):
            Rectangle(SKETCH5_W, SKETCH5_H)
        with Locations((50.551012373, 29.945933752)):
            Rectangle(SKETCH5_W_2, SKETCH5_H)
    extrude(amount=-BOSS_EXTRUDE3_DEPTH)

    # Sketch6 → Cut-Extrude4 (cut)
    with BuildSketch(Plane.XZ):
        with Locations(Location((19.499653324, -22.277952011, 0), (0, 0, 270))):
            Circle(SKETCH6_R)
        with Locations(Location((40.200559357, -27.389939838, 0), (0, 0, 270))):
            Circle(SKETCH6_R)
        with Locations(Location((60.901465389, -32.501927666, 0), (0, 0, 270))):
            Circle(SKETCH6_R)
    extrude(amount=-CUT_EXTRUDE4_DEPTH, mode=Mode.SUBTRACT)


solid = part_1.part
